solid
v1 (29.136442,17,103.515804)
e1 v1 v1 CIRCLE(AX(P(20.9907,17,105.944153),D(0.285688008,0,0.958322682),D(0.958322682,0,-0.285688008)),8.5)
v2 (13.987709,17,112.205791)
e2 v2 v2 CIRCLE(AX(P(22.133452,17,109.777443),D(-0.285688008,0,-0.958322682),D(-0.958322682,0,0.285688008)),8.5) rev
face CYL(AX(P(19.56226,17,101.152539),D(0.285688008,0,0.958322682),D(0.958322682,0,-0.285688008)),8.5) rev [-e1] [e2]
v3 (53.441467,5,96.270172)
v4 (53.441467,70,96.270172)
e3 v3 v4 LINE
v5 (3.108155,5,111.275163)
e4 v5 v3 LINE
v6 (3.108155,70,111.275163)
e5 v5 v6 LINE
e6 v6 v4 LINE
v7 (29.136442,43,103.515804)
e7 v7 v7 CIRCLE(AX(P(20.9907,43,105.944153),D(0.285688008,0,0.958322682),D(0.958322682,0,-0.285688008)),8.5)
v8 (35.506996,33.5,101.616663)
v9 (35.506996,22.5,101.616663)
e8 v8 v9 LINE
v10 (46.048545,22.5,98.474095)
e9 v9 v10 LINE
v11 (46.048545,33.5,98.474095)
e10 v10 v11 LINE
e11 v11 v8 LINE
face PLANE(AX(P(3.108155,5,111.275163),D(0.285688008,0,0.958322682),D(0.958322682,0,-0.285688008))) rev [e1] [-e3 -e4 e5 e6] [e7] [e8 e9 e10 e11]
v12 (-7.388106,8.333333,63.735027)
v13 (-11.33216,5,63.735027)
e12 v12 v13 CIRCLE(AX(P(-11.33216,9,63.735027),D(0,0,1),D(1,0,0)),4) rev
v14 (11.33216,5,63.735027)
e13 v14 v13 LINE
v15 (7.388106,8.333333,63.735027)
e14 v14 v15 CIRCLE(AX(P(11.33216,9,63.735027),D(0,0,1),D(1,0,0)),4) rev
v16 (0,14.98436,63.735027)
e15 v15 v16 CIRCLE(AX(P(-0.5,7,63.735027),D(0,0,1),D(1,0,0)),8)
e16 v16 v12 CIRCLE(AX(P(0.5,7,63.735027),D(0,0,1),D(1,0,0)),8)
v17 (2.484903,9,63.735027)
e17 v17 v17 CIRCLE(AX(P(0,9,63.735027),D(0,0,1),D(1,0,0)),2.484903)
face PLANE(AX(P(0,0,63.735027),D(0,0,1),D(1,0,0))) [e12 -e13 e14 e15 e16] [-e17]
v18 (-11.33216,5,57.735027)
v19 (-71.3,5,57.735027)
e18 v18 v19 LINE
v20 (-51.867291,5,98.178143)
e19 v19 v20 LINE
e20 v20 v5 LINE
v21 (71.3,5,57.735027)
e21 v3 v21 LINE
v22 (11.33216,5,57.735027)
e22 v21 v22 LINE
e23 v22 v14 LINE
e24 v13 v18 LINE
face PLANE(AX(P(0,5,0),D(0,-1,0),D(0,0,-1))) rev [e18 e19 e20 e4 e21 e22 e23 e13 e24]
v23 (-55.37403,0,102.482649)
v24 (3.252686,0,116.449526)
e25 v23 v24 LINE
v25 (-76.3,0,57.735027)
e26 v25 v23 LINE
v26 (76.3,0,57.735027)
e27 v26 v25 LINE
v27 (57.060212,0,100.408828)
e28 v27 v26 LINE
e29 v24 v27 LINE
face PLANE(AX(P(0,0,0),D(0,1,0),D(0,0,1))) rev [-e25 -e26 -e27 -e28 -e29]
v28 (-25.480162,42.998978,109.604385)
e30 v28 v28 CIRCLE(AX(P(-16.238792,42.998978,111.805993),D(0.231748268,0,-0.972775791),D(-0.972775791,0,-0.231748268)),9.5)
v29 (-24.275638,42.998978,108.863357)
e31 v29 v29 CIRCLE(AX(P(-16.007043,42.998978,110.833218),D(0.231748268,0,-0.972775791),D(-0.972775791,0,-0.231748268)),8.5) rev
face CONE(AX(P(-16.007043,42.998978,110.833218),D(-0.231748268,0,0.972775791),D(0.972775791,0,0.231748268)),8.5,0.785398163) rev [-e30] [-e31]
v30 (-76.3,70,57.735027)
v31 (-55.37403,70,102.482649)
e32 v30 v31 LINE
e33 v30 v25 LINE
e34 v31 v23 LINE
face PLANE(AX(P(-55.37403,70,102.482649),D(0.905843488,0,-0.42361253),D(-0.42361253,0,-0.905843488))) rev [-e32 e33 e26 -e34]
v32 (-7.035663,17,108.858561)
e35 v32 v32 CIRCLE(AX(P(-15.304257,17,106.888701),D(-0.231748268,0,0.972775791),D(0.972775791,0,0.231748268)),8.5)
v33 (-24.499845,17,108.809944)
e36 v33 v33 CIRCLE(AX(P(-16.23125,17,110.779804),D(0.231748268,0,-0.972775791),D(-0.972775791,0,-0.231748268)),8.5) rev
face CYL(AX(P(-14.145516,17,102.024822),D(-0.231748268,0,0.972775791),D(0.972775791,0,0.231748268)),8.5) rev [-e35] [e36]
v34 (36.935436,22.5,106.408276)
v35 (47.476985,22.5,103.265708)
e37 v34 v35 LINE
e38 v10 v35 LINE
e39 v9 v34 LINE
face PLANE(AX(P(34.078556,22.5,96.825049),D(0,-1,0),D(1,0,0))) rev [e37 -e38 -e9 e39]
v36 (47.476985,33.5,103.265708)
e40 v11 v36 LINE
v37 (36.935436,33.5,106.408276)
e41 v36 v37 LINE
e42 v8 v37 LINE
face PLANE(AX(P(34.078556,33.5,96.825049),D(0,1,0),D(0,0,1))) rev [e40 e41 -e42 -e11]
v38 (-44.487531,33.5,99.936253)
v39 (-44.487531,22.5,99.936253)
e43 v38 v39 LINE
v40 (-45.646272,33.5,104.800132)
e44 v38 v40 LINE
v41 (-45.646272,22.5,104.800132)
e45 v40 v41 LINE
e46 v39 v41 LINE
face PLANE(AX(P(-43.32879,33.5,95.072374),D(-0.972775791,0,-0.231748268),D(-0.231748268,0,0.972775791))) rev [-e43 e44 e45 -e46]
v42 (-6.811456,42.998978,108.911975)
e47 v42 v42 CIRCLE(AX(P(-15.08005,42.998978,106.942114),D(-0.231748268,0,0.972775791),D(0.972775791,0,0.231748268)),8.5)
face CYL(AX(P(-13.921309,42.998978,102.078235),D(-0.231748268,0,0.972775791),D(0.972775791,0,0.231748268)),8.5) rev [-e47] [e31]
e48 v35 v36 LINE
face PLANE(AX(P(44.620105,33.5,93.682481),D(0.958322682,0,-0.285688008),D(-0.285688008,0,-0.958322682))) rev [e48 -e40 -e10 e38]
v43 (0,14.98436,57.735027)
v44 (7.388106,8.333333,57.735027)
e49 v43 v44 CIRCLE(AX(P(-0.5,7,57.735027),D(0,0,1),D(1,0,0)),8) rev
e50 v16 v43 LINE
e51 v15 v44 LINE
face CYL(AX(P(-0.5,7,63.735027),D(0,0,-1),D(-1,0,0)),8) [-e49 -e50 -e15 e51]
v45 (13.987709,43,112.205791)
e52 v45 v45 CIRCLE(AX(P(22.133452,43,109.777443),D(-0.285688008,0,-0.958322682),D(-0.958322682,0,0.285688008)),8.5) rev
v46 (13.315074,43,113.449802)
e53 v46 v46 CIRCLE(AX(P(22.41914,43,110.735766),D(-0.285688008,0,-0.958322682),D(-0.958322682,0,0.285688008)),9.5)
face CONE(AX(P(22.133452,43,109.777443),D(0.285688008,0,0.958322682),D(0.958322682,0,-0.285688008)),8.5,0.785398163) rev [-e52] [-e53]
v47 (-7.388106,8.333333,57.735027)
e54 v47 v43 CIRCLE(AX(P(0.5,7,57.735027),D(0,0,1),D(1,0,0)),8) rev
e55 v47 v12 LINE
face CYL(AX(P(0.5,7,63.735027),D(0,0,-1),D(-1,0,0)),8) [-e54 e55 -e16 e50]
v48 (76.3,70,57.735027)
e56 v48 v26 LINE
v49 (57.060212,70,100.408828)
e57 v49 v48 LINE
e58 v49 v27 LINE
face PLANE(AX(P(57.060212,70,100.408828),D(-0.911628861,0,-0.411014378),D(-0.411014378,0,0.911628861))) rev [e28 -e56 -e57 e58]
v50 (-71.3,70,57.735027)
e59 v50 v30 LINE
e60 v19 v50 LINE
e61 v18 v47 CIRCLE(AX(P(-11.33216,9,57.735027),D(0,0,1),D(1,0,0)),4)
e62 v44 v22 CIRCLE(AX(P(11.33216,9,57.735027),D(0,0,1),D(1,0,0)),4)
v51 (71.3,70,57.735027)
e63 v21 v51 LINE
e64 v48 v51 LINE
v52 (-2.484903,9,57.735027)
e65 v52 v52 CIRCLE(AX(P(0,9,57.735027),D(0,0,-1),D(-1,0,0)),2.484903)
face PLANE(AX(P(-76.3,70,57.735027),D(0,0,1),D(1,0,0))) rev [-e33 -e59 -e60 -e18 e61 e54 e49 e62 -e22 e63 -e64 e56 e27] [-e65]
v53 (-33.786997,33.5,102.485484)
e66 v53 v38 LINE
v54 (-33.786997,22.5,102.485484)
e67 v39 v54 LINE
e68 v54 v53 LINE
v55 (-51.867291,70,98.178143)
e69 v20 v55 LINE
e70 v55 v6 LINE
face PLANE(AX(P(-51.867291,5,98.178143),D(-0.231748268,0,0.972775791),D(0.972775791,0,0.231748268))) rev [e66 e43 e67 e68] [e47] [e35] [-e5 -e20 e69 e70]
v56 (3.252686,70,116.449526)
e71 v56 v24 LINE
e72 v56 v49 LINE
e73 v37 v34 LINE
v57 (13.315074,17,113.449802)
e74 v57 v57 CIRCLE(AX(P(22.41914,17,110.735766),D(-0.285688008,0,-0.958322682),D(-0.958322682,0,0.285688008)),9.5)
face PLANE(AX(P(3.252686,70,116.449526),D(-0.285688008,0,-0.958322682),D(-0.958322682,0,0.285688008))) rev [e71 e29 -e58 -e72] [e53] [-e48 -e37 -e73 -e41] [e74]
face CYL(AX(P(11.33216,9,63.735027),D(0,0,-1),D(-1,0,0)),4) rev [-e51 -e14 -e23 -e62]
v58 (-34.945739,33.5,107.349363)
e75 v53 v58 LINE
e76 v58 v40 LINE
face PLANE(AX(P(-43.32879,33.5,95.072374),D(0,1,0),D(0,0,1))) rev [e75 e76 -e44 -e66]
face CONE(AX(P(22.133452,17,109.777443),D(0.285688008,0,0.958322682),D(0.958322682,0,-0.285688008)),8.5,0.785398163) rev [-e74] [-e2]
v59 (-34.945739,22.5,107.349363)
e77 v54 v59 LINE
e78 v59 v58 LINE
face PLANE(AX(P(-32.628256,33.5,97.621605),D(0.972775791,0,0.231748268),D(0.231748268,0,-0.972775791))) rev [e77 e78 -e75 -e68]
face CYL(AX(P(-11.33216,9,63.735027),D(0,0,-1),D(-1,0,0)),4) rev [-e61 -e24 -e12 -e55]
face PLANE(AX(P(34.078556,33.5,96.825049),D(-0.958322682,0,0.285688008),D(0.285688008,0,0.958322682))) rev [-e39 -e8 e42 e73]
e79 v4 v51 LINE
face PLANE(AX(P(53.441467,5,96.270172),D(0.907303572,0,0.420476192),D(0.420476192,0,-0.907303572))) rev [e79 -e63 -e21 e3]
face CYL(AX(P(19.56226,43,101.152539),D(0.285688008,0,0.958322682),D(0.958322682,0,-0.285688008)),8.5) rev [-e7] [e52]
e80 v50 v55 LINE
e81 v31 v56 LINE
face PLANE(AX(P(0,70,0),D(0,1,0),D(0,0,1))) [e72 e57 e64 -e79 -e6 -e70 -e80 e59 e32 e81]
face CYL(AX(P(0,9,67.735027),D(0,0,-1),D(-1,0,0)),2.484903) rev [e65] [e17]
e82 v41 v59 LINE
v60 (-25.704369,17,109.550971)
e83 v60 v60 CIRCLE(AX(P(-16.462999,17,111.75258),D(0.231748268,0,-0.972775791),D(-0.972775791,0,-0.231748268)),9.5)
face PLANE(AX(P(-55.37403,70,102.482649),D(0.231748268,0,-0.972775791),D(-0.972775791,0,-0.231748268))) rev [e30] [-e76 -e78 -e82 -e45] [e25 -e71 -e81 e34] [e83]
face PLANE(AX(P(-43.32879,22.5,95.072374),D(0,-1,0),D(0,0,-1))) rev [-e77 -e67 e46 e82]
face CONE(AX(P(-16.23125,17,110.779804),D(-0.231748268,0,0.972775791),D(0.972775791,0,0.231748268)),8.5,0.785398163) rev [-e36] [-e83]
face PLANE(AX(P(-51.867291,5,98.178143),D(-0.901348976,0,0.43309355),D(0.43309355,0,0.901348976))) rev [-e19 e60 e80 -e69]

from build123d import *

# Parameters (mm, degrees)
BOSS_EXTRUDE1_DEPTH = 70
CUT_EXTRUDE1_DEPTH  = 65
SKETCH5_R           = 8.5
CUT_EXTRUDE2_DEPTH  = 10
SKETCH6_R           = 8.5
CUT_EXTRUDE3_DEPTH  = 10
CHAMFER2_SIZE       = 1
SKETCH7_W           = 11
SKETCH7_H           = 11
CUT_EXTRUDE4_DEPTH  = 10
SKETCH8_W           = 11
SKETCH8_H           = 11
CUT_EXTRUDE5_DEPTH  = 10
SKETCH9_W           = 15
SKETCH9_H           = 10
BOSS_EXTRUDE2_DEPTH = 6
FILLET1_R           = 8
FILLET2_R           = 4
SKETCH11_R          = 2.484902638
CUT_EXTRUDE7_DEPTH  = 10


with BuildPart() as part:
    # Sketch1 → Boss-Extrude1 (new body)
    with BuildSketch(Plane(origin=(0, 0, 0), x_dir=(1, 0, 0), z_dir=(0, 1, 0))):
        Polygon((-55.37403033, -102.482648945), (3.252686078, -116.449526131), (57.060212297, -100.408827863), (76.3, -57.735026919), (-76.3, -57.735026919), align=None)
    extrude(amount=BOSS_EXTRUDE1_DEPTH)

    # Sketch4 → Cut-Extrude1 (cut)
    with BuildSketch(Plane(origin=(0, 70, 0), x_dir=(1, 0, 0), z_dir=(0, 1, 0))):
        Polygon((-51.867290581, -98.178143042), (3.108154981, -111.275163368), (53.44146669, -96.270172009), (71.3, -57.735026919), (-71.3, -57.735026919), align=None)
    extrude(amount=-CUT_EXTRUDE1_DEPTH, mode=Mode.SUBTRACT)

    # Sketch5 → Cut-Extrude2 (cut)
    with BuildSketch(Plane(origin=(-26.077584107, 0, 109.462058529), x_dir=(0.9727757912880333, 0, 0.23174826835154788), z_dir=(-0.23174826835154788, 0, 0.9727757912880333))):
        with Locations((10.114141871, 42.998978407)):
            Circle(SKETCH5_R)
        with Locations((9.883660258, 17)):
            Circle(SKETCH5_R)
    extrude(amount=-CUT_EXTRUDE2_DEPTH, mode=Mode.SUBTRACT)

    # Sketch6 → Cut-Extrude3 (cut)
    with BuildSketch(Plane(origin=(32.147178959, 0, 107.83571549), x_dir=(0.9583226816177197, 0, -0.28568800796852273), z_dir=(0.2856880079685227, 0, 0.9583226816177196))):
        with Locations((-10.151110305, 17)):
            Circle(SKETCH6_R)
        with Locations((-10.151110305, 43)):
            Circle(SKETCH6_R)
    extrude(amount=-CUT_EXTRUDE3_DEPTH, mode=Mode.SUBTRACT)

    # Chamfer2
    chamfer2_edges = [part.edges().sort_by_distance(p)[0] for p in [
        (-24.507385971, 42.998978407, 109.836133113),
        (-24.731592905, 17, 109.782719398),
        (14.273396917, 17, 113.164114039),
        (14.273396917, 43, 113.164114039),
    ]]
    chamfer(chamfer2_edges, length=CHAMFER2_SIZE)

    # Sketch7 → Cut-Extrude4 (cut)
    with BuildSketch(Plane(origin=(-26.077584107, 0, 109.462058529), x_dir=(0.9727757912880333, 0, 0.23174826835154788), z_dir=(-0.23174826835154788, 0, 0.9727757912880333))):
        with Locations((-14.616339742, 28)):
            Rectangle(SKETCH7_W, SKETCH7_H)
    extrude(amount=-CUT_EXTRUDE4_DEPTH, mode=Mode.SUBTRACT)

    # Sketch8 → Cut-Extrude5 (cut)
    with BuildSketch(Plane(origin=(32.147178959, 0, 107.83571549), x_dir=(0.9583226816177197, 0, -0.28568800796852273), z_dir=(0.2856880079685227, 0, 0.9583226816177196))):
        with Locations((10.496497648, 28)):
            Rectangle(SKETCH8_W, SKETCH8_H)
    extrude(amount=-CUT_EXTRUDE5_DEPTH, mode=Mode.SUBTRACT)

    # Sketch9 → Boss-Extrude2 (add)
    with BuildSketch(Plane(origin=(0, 0, 57.735026919), x_dir=(-1, 0, 0), z_dir=(0, 0, -1))):
        with Locations((0, 10)):
            Rectangle(SKETCH9_W, SKETCH9_H)
    extrude(amount=-BOSS_EXTRUDE2_DEPTH)

    # Fillet1
    # the kernel refuses this fillet: 8 mm, written as the material it takes off along each edge
    with BuildSketch(Plane(origin=(-7.5, 15, 37.735026919), x_dir=(0, -1, 0), z_dir=(0, 0, 1))) as fillet1_piece_1:
        with BuildLine():
            CenterArc((FILLET1_R, FILLET1_R), FILLET1_R, 180, 90)
            Line((0, FILLET1_R), (0, 0))
            Line((0, 0), (FILLET1_R, 0))
        make_face()
    extrude(amount=46, mode=Mode.SUBTRACT)
    with BuildSketch(Plane(origin=(7.5, 15, 37.735026919), x_dir=(0, -1, 0), z_dir=(0, 0, 1))) as fillet1_piece_2:
        with BuildLine():
            CenterArc((FILLET1_R, -FILLET1_R), FILLET1_R, 90, 90)
            Line((0, -FILLET1_R), (0, 0))
            Line((0, 0), (FILLET1_R, 0))
        make_face()
    extrude(amount=46, mode=Mode.SUBTRACT)

    # Fillet2
    # the kernel refuses this fillet: 4 mm, written as the material it adds along each edge
    with BuildSketch(Plane(origin=(-7.5, 5, 57.735026919), x_dir=(-1, 0, 0), z_dir=(0, 0, 1))) as fillet2_piece_1:
        with BuildLine():
            CenterArc((3.832159566, -4), FILLET2_R, 90, 80.405931773)
            Line((-0.111893623, -3.333333333), (-0.506298941, -3.266666667))
            ThreePointArc((-0.506298941, -3.266666667), (-0.4, -2), (-0.4, 0))
            Line((-0.4, 0), (0, 0.4))
            Line((0, 0.4), (3.832159566, 0.4))
            Line((3.832159566, 0.4), (3.832159566, 0))
        make_face()
    extrude(amount=6)
    with BuildSketch(Plane(origin=(7.5, 5, 57.735026919), x_dir=(1, 0, 0), z_dir=(0, 0, 1))) as fillet2_piece_2:
        with BuildLine():
            CenterArc((3.832159566, 4), FILLET2_R, 189.594068227, 80.405931773)
            Line((-0.111893623, 3.333333333), (-0.506298941, 3.266666667))
            ThreePointArc((-0.506298941, 3.266666667), (-0.4, 2), (-0.4, 0))
            Line((-0.4, 0), (0, -0.4))
            Line((0, -0.4), (3.832159566, -0.4))
            Line((3.832159566, -0.4), (3.832159566, 0))
        make_face()
    extrude(amount=6)

    # Sketch11 → Cut-Extrude7 (cut)
    with BuildSketch(Plane(origin=(0, 0, 57.735026919), x_dir=(-1, 0, 0), z_dir=(0, 0, -1))):
        with Locations((0, 9)):
            Circle(SKETCH11_R)
    extrude(amount=-CUT_EXTRUDE7_DEPTH, mode=Mode.SUBTRACT)


solid = part.part
